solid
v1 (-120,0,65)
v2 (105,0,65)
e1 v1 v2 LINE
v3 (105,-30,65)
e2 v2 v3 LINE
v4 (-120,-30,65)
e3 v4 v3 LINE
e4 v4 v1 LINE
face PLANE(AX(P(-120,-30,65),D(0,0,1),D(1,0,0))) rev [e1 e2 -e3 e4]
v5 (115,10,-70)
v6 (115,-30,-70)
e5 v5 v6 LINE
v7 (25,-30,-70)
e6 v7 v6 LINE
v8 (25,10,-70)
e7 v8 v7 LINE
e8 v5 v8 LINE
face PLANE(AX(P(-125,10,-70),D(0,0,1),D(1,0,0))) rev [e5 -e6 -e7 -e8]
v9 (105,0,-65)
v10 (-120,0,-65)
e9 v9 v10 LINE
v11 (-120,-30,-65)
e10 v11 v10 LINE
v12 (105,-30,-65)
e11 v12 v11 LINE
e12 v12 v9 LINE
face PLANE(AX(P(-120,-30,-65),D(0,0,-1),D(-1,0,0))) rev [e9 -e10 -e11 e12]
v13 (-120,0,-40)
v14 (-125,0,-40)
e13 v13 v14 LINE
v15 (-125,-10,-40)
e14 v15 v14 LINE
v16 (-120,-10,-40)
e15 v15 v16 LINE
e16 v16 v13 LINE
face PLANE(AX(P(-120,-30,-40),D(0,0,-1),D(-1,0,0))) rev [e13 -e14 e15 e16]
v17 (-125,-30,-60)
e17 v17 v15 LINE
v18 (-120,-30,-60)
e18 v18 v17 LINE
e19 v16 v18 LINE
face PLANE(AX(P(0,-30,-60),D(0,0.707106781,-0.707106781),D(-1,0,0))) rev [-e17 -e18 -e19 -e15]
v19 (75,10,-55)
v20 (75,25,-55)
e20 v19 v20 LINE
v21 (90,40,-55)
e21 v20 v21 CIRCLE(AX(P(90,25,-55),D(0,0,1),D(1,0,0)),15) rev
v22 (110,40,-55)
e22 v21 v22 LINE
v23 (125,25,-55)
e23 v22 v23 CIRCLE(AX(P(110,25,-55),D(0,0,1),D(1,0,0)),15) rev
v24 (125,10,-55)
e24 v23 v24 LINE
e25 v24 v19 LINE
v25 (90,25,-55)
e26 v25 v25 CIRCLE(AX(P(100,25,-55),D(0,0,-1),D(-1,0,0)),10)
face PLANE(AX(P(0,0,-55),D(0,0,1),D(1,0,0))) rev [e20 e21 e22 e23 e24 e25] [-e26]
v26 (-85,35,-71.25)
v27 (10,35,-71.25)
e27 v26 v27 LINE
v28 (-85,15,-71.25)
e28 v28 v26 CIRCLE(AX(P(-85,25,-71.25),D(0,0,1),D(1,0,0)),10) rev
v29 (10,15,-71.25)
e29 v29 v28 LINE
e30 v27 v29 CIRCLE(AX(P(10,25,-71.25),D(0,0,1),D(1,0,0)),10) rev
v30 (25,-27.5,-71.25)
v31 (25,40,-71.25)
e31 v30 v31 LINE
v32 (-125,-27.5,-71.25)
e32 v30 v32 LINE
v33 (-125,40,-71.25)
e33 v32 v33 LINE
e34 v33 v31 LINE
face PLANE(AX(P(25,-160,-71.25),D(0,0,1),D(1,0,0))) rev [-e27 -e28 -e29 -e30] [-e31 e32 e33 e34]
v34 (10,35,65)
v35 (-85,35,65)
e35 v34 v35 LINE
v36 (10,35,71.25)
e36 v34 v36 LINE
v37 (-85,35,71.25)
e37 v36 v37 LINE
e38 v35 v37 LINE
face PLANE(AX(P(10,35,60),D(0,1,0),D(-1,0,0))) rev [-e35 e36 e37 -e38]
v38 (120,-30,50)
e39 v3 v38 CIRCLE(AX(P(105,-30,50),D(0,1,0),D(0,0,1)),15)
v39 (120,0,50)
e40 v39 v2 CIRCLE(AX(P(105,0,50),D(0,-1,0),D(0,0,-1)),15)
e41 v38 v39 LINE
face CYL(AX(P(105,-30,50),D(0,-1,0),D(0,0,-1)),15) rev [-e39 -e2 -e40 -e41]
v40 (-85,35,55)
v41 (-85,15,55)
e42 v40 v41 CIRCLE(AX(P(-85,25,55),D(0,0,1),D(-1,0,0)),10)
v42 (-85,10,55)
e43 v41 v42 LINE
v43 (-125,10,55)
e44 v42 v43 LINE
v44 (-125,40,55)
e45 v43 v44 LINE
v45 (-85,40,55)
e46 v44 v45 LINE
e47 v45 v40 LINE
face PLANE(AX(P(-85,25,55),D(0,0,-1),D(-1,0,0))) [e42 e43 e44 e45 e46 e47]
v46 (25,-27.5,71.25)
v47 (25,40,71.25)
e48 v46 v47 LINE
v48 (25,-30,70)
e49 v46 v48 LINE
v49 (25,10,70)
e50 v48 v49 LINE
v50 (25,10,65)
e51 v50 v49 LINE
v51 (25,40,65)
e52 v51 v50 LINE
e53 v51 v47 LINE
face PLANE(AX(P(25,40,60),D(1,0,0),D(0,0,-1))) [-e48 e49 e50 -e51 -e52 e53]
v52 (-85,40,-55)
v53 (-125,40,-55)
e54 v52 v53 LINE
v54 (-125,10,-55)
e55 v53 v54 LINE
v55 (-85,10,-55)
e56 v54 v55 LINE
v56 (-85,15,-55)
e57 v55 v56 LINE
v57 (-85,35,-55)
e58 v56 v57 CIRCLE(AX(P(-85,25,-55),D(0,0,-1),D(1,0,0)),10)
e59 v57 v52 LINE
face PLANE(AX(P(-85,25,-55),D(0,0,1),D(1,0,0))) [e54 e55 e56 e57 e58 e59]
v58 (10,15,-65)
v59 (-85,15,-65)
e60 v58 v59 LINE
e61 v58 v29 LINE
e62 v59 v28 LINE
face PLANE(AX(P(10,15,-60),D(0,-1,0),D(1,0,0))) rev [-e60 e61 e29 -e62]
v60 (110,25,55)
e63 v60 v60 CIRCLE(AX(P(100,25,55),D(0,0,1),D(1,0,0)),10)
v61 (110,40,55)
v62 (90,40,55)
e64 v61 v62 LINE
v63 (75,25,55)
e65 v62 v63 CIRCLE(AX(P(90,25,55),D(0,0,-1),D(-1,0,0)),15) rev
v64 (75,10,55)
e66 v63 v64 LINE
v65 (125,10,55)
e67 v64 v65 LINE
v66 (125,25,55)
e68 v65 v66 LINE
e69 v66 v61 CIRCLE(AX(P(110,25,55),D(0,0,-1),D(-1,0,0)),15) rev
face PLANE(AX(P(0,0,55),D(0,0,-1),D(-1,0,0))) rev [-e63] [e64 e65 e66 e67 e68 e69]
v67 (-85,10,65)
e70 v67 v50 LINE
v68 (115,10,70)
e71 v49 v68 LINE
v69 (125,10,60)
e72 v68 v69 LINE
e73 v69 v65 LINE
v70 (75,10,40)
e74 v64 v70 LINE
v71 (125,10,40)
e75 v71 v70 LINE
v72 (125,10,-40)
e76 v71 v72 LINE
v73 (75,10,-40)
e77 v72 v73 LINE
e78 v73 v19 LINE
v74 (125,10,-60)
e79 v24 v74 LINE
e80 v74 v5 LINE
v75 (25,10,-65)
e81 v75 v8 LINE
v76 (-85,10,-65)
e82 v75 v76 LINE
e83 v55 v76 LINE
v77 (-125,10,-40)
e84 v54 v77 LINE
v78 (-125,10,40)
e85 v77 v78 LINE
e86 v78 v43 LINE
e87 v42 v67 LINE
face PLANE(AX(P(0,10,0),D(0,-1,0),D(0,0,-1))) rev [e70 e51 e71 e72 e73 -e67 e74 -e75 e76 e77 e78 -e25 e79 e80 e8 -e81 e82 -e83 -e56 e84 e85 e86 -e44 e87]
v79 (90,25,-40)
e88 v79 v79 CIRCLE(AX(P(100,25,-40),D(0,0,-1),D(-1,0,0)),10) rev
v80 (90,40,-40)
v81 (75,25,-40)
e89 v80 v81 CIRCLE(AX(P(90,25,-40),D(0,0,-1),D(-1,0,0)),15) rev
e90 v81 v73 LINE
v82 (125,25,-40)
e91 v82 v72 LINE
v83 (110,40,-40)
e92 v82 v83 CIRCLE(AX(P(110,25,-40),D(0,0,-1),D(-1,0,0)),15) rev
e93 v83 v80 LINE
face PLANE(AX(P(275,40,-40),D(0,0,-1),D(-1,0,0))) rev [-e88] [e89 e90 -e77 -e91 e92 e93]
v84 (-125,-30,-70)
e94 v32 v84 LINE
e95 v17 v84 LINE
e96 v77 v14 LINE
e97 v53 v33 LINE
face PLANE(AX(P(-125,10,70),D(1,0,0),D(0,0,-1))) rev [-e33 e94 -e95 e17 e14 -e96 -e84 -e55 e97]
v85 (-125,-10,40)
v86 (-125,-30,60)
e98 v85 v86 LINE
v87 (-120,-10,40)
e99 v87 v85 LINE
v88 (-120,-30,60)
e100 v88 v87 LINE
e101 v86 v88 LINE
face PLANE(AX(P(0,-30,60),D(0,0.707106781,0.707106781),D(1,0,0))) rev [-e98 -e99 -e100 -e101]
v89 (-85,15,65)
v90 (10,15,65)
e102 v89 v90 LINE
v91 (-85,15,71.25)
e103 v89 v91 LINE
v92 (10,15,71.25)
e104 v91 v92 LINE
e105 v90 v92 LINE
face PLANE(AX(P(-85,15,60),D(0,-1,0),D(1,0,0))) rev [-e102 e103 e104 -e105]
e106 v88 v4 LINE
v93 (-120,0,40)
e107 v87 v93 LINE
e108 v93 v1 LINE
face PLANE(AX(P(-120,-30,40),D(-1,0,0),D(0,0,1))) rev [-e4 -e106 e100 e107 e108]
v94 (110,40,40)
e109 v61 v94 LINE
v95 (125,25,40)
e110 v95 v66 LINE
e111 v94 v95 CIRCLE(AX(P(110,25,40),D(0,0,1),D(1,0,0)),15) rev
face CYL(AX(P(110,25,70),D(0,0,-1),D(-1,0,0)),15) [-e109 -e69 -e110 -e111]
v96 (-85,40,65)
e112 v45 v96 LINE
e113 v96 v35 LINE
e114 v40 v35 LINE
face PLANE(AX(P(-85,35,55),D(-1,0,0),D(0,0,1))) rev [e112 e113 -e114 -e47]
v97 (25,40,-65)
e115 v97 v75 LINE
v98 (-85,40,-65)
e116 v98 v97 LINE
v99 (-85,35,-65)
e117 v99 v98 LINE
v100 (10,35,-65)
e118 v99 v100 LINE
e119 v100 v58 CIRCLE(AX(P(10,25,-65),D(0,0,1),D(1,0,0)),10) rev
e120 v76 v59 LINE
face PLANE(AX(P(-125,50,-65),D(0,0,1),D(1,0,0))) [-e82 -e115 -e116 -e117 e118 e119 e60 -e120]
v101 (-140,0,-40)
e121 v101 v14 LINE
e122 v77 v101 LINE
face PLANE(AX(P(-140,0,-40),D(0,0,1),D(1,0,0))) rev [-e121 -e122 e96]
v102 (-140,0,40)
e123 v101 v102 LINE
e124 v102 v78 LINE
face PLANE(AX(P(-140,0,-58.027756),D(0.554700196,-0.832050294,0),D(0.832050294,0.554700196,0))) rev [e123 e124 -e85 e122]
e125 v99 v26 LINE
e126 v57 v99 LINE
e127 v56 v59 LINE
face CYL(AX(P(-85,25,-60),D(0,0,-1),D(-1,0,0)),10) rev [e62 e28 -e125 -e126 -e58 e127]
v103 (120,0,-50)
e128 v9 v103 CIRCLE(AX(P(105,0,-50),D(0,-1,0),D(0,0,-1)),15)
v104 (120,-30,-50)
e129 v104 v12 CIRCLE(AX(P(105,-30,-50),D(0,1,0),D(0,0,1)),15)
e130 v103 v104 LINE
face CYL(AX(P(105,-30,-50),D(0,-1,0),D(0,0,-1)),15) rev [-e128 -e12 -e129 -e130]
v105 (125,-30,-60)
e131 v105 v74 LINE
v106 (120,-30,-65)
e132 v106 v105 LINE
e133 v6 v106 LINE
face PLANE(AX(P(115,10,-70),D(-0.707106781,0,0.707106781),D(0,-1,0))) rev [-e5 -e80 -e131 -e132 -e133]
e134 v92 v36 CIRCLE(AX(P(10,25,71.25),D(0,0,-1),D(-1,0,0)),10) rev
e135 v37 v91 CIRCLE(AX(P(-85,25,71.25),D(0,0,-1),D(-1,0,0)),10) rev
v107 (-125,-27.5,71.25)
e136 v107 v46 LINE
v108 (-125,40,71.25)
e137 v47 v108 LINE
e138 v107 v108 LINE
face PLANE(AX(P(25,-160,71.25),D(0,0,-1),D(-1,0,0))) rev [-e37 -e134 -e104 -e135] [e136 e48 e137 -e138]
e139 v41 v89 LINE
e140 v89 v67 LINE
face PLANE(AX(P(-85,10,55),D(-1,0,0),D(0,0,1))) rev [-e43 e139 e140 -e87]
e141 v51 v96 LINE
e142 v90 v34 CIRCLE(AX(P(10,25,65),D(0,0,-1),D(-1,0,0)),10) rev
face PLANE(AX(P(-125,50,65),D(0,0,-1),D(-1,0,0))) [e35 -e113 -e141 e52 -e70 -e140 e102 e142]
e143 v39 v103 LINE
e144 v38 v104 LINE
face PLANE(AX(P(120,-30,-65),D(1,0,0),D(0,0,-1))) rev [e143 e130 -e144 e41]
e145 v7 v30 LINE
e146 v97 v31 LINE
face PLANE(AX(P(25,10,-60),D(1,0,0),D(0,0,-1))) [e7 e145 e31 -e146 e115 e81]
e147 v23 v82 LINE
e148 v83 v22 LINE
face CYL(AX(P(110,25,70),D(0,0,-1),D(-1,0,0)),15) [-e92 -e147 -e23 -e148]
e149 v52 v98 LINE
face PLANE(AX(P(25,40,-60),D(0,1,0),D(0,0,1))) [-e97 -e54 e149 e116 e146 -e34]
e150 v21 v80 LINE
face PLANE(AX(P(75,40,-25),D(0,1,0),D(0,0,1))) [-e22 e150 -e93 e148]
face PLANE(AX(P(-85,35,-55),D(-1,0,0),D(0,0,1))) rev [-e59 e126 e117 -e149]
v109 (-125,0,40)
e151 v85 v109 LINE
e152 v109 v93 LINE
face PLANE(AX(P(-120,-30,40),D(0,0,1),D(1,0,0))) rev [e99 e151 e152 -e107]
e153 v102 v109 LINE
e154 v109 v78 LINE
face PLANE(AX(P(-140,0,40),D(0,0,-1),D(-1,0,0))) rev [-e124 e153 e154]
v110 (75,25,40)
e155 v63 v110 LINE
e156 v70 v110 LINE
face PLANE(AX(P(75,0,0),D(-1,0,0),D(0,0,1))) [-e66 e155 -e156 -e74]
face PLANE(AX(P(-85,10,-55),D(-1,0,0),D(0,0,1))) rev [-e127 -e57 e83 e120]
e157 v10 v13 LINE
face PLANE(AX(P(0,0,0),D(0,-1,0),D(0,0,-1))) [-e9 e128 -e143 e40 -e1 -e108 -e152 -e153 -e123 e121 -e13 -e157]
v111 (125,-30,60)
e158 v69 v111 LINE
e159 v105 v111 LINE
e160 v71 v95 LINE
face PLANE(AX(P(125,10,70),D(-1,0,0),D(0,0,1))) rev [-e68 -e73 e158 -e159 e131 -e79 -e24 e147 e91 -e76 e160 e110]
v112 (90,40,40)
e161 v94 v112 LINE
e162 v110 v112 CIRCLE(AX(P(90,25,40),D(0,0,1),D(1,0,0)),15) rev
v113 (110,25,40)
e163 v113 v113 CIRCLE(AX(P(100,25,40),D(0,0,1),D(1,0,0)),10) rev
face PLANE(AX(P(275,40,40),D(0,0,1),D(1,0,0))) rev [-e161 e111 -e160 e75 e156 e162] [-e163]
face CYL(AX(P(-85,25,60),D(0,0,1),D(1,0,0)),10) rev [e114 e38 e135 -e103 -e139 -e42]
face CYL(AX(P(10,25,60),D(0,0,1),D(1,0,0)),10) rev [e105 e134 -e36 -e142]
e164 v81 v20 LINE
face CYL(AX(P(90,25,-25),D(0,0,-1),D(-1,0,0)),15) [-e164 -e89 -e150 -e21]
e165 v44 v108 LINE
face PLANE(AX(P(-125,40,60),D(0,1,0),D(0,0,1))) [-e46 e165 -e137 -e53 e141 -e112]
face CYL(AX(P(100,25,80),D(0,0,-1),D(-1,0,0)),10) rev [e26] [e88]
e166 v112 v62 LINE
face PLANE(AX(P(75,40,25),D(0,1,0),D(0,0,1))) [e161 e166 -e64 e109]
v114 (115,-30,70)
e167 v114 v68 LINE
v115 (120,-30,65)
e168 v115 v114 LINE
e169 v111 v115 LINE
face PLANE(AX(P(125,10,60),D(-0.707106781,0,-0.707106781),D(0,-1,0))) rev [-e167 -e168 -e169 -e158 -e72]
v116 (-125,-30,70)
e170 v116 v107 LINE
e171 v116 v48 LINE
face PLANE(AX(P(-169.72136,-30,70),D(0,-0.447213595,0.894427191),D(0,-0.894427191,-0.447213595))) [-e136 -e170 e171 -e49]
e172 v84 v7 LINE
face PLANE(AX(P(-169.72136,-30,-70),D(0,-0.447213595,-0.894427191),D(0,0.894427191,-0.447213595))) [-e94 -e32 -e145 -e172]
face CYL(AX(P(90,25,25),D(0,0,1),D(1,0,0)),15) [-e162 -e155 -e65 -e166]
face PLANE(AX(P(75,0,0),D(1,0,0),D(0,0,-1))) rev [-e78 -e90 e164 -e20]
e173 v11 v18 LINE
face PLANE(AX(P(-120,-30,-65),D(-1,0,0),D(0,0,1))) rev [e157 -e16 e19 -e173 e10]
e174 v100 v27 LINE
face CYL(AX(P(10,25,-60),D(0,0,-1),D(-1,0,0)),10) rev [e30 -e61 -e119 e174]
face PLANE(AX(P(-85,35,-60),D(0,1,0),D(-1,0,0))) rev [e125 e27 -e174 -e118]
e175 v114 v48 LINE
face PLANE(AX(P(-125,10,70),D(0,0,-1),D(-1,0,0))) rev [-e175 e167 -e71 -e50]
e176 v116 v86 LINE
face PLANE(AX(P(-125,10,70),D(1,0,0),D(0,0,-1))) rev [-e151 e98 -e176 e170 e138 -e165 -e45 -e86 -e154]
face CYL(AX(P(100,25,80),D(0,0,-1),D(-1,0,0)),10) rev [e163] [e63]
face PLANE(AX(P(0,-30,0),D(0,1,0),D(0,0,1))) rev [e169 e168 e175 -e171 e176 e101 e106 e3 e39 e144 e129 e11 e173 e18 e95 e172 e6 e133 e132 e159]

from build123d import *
from build123d.topology import SkipClean

# Parameters (mm, degrees)
SKETCH1_W            = 250
SKETCH1_H            = 140
BOSS_EXTRUDE1_DEPTH  = 10
SKETCH2_W            = 150
SKETCH2_H            = 20
SKETCH2_W_2          = 50
BOSS_EXTRUDE2_DEPTH  = 30
CUT_EXTRUDE1_DEPTH   = 120
SKETCH4_R            = 10
CUT_EXTRUDE2_DEPTH   = 150
SKETCH6_W            = 10
SKETCH6_H            = 40
CUT_EXTRUDE4_DEPTH   = 150
SKETCH7_R            = 10
CUT_EXTRUDE5_DEPTH   = 150
FILLET2_R            = 10
FILLET3_R            = 10
SKETCH13_W           = 50
SKETCH13_H           = 25
SKETCH13_H_2         = 22.244291656
CUT_EXTRUDE6_DEPTH   = 40
SKETCH14_W           = 150
SKETCH14_H           = 30
BOSS_EXTRUDE3_DEPTH  = 10
BOSS_EXTRUDE4_START  = -10
SKETCH16_W           = 150
SKETCH16_H           = 30
BOSS_EXTRUDE4_DEPTH  = 10
SKETCH17_W           = 10
SKETCH17_H           = 30
BOSS_EXTRUDE5_DEPTH  = 50
CUT_EXTRUDE7_START   = -150
SKETCH18_R           = 10
CUT_EXTRUDE7_DEPTH   = 150
SKETCH19_W           = 163.570579747
SKETCH19_H           = 99.685934981
SKETCH19_W_2         = 64.103217044
SKETCH19_H_2         = 29.878618113
SKETCH19_W_3         = 86.104744928
SKETCH19_H_3         = 39.38545115
SKETCH19_W_4         = 22.687824792
SKETCH19_H_4         = 45.375649583
CUT_EXTRUDE8_DEPTH   = 150
BOSS_EXTRUDE6_DEPTH  = 30
BOSS_EXTRUDE8_START  = 20
SKETCH21_W           = 50
SKETCH21_H           = 30
SKETCH21_R           = 10
BOSS_EXTRUDE8_DEPTH  = 20
SKETCH22_W           = 50
SKETCH22_H           = 30
SKETCH22_R           = 10
BOSS_EXTRUDE9_DEPTH  = 20
BOSS_EXTRUDE10_START = 20
SKETCH23_W           = 150
SKETCH23_H           = 30
BOSS_EXTRUDE10_DEPTH = 20
SKETCH24_W           = 150
SKETCH24_H           = 30
BOSS_EXTRUDE11_DEPTH = 20
BOSS_EXTRUDE12_DEPTH = 150
SKETCH27_W           = 150
SKETCH27_H           = 5
CUT_EXTRUDE10_DEPTH  = 40
CUT_EXTRUDE11_REACH  = 270.701
SKETCH28_W           = 27.40328495
SKETCH28_H           = 74.426737968
SKETCH28_W_2         = 23.413674561
SKETCH28_H_2         = 78.651031322
SKETCH29_W           = 80
SKETCH29_H           = 10
BOSS_EXTRUDE13_DEPTH = 15
CUT_EXTRUDE12_DEPTH  = 80
SKETCH40_W           = 150
SKETCH40_H           = 6.25
CUT_EXTRUDE16_DEPTH  = 200
CHAMFER1_SIZE        = 10
FILLET6_R            = 15
CHAMFER2_SIZE        = 20
FILLET7_R            = 15
SKETCH41_W           = 80
SKETCH41_H           = 30
CUT_EXTRUDE18_DEPTH  = 200
BOSS_EXTRUDE16_START = 10
BOSS_EXTRUDE16_DEPTH = 10
BOSS_EXTRUDE17_DEPTH = 10


with BuildPart() as part:
    # Sketch1 → Boss-Extrude1 (new body)
    with BuildSketch(Plane(origin=(0, 0, 0), x_dir=(1, 0, 0), z_dir=(0, 1, 0))):
        Rectangle(SKETCH1_W, SKETCH1_H)
    extrude(amount=BOSS_EXTRUDE1_DEPTH)

    # Sketch2 → Boss-Extrude2 (add)
    with BuildSketch(Plane(origin=(0, 10, 0), x_dir=(1, 0, 0), z_dir=(0, 1, 0))):
        with Locations((-50, 35)):
            Rectangle(SKETCH2_W, SKETCH2_H)
        with Locations((-50, -35)):
            Rectangle(SKETCH2_W, SKETCH2_H)
        Polygon((125, -20), (125, 0), (125, 20), (105, 20), (105, -20), align=None)
        with Locations((100, 60)):
            Rectangle(SKETCH2_W_2, SKETCH2_H)
        with Locations((100, -60)):
            Rectangle(SKETCH2_W_2, SKETCH2_H)
    extrude(amount=BOSS_EXTRUDE2_DEPTH)

    # Sketch3 → Cut-Extrude1 (cut)
    with BuildSketch(Plane.XY.offset(45)):
        with BuildLine():
            Line((10, 35), (-110, 35))
            ThreePointArc((-110, 35), (-120, 25), (-110, 15))
            Line((-110, 15), (10, 15))
            ThreePointArc((10, 15), (20, 25), (10, 35))
        make_face()
    extrude(amount=-CUT_EXTRUDE1_DEPTH, mode=Mode.SUBTRACT)

    # Sketch4 → Cut-Extrude2 (cut)
    with BuildSketch(Plane.XY.offset(70)):
        with Locations((100, 25)):
            Circle(SKETCH4_R)
    extrude(amount=-CUT_EXTRUDE2_DEPTH, mode=Mode.SUBTRACT)

    # Sketch6 → Cut-Extrude4 (cut)
    with BuildSketch(Plane(origin=(0, 10, 0), x_dir=(1, 0, 0), z_dir=(0, 1, 0))):
        with Locations((110, 0)):
            Rectangle(SKETCH6_W, SKETCH6_H)
    extrude(amount=CUT_EXTRUDE4_DEPTH, mode=Mode.SUBTRACT)

    # Sketch7 → Cut-Extrude5 (cut)
    with BuildSketch(Plane(origin=(125, 0, 0), x_dir=(0, 0, -1), z_dir=(1, 0, 0))):
        with Locations((0, 25)):
            Circle(SKETCH7_R)
    extrude(amount=-CUT_EXTRUDE5_DEPTH, mode=Mode.SUBTRACT)

    # Fillet2
    fillet2_edges = [part.edges().sort_by_distance(p)[0] for p in [
        (120, 40, 20),
        (120, 40, -20),
    ]]
    fillet(fillet2_edges, radius=FILLET2_R)

    # Fillet3
    fillet3_edges = [part.edges().sort_by_distance(p)[0] for p in [
        (75, 40, -60),
        (125, 40, -60),
        (75, 40, 60),
        (125, 40, 60),
    ]]
    fillet(fillet3_edges, radius=FILLET3_R)

    # Sketch13 → Cut-Extrude6 (cut)
    with BuildSketch(Plane(origin=(0, 10, 0), x_dir=(1, 0, 0), z_dir=(0, 1, 0))):
        with Locations((100, 47.5)):
            Rectangle(SKETCH13_W, SKETCH13_H)
        with Locations((100, -48.877854172)):
            Rectangle(SKETCH13_W, SKETCH13_H_2)
    extrude(amount=CUT_EXTRUDE6_DEPTH, mode=Mode.SUBTRACT)

    # Sketch14 → Boss-Extrude3 (add)
    with BuildSketch(Plane.XY.offset(70)):
        with Locations((-50, 25)):
            Rectangle(SKETCH14_W, SKETCH14_H)
        with BuildLine():
            Line((10, 35), (-85, 35))
            ThreePointArc((-85, 35), (-95, 25), (-85, 15))
            Line((-85, 15), (10, 15))
            ThreePointArc((10, 15), (20, 25), (10, 35))
        make_face(mode=Mode.SUBTRACT)
    extrude(amount=-BOSS_EXTRUDE3_DEPTH)

    # Sketch16 → Boss-Extrude4 (add)
    with BuildSketch(Plane(origin=(0, 0, -70), x_dir=(-1, 0, 0), z_dir=(0, 0, -1)).offset(BOSS_EXTRUDE4_START)):
        with Locations((50, 25)):
            Rectangle(SKETCH16_W, SKETCH16_H)
        with BuildLine():
            Line((85, 35), (-10, 35))
            ThreePointArc((-10, 35), (-20, 25), (-10, 15))
            Line((-10, 15), (85, 15))
            ThreePointArc((85, 15), (95, 25), (85, 35))
        make_face(mode=Mode.SUBTRACT)
    extrude(amount=BOSS_EXTRUDE4_DEPTH)

    # Sketch17 → Boss-Extrude5 (add)
    with BuildSketch(Plane(origin=(125, 0, 0), x_dir=(0, 0, -1), z_dir=(1, 0, 0))):
        with Locations((30, 25)):
            Rectangle(SKETCH17_W, SKETCH17_H)
        with Locations((-30, 25)):
            Rectangle(SKETCH17_W, SKETCH17_H)
    extrude(amount=-BOSS_EXTRUDE5_DEPTH)

    # Sketch18 → Cut-Extrude7 (cut)
    with BuildSketch(Plane(origin=(0, 0, -70), x_dir=(-1, 0, 0), z_dir=(0, 0, -1)).offset(CUT_EXTRUDE7_START)):
        with Locations(Location((-100, 25, 0), (0, 0, 180))):
            Circle(SKETCH18_R)
    extrude(amount=CUT_EXTRUDE7_DEPTH, mode=Mode.SUBTRACT)

    # Sketch19 → Cut-Extrude8 (cut)
    with BuildSketch(Plane(origin=(0, 10, 0), x_dir=(1, 0, 0), z_dir=(0, 1, 0))):
        with Locations((-43.214710127, 0.1358119)):
            Rectangle(SKETCH19_W, SKETCH19_H)
        with Locations((99.142687378, 64.918088447)):
            Rectangle(SKETCH19_W_2, SKETCH19_H_2)
        with Locations((110.14345132, -67.226890756)):
            Rectangle(SKETCH19_W_3, SKETCH19_H_3)
        with Locations((124.2319325, 0.52597354)):
            Rectangle(SKETCH19_W_4, SKETCH19_H_4)
    extrude(amount=CUT_EXTRUDE8_DEPTH, mode=Mode.SUBTRACT)

    # Sketch20 → Boss-Extrude6 (add)
    with BuildSketch(Plane.XZ):
        Polygon((-125, 40), (-125, 70), (125, 70), (125, -70), (-125, -70), (-125, -40), (-120, -40), (-120, -65), (120, -65), (120, 65), (-120, 65), (-120, 40), align=None)
    extrude(amount=BOSS_EXTRUDE6_DEPTH)

    # Sketch21 → Boss-Extrude8 (add)
    with SkipClean():  # the faces are left unmerged after this step: merging them gives an invalid solid
        with BuildSketch(Plane.XY.offset(35).offset(BOSS_EXTRUDE8_START)):
            with Locations((100, 25)):
                Rectangle(SKETCH21_W, SKETCH21_H)
            with Locations(Location((100, 25, 0), (0, 0, 180))):
                Circle(SKETCH21_R, mode=Mode.SUBTRACT)
        extrude(amount=-BOSS_EXTRUDE8_DEPTH)

    # Sketch22 → Boss-Extrude9 (add)
    with SkipClean():  # the faces are left unmerged after this step: merging them gives an invalid solid
        with BuildSketch(Plane(origin=(0, 0, -35), x_dir=(-1, 0, 0), z_dir=(0, 0, -1))):
            with Locations((-100, 25)):
                Rectangle(SKETCH22_W, SKETCH22_H)
            with Locations((-100, 25)):
                Circle(SKETCH22_R, mode=Mode.SUBTRACT)
        extrude(amount=BOSS_EXTRUDE9_DEPTH)

    # Sketch23 → Boss-Extrude10 (add)
    with SkipClean():  # the faces are left unmerged after this step: merging them gives an invalid solid
        with BuildSketch(Plane.XY.offset(70).offset(BOSS_EXTRUDE10_START)):
            with Locations((-50, 25)):
                Rectangle(SKETCH23_W, SKETCH23_H)
            with BuildLine():
                Line((10, 35), (-85, 35))
                ThreePointArc((-85, 35), (-95, 25), (-85, 15))
                Line((-85, 15), (10, 15))
                ThreePointArc((10, 15), (20, 25), (10, 35))
            make_face(mode=Mode.SUBTRACT)
        extrude(amount=-BOSS_EXTRUDE10_DEPTH)

    # Sketch24 → Boss-Extrude11 (add)
    with SkipClean():  # the faces are left unmerged after this step: merging them gives an invalid solid
        with BuildSketch(Plane(origin=(0, 0, -70), x_dir=(-1, 0, 0), z_dir=(0, 0, -1))):
            with Locations((50, 25)):
                Rectangle(SKETCH24_W, SKETCH24_H)
            with BuildLine():
                Line((-10, 35), (85, 35))
                ThreePointArc((85, 35), (95, 25), (85, 15))
                Line((85, 15), (-10, 15))
                ThreePointArc((-10, 15), (-20, 25), (-10, 35))
            make_face(mode=Mode.SUBTRACT)
        extrude(amount=BOSS_EXTRUDE11_DEPTH)

    # Sketch26 → Boss-Extrude12 (add)
    with SkipClean():  # the faces are left unmerged after this step: merging them gives an invalid solid
        with BuildSketch(Plane(origin=(25, 0, 0), x_dir=(0, 0, -1), z_dir=(1, 0, 0))):
            Polygon((70, -30), (90, 10), (70, 10), align=None)
            Polygon((-90, 10), (-70, 10), (-70, -30), align=None)
        extrude(amount=-BOSS_EXTRUDE12_DEPTH)

    # Sketch27 → Cut-Extrude10 (cut)
    with SkipClean():  # the faces are left unmerged after this step: merging them gives an invalid solid
        with BuildSketch(Plane(origin=(0, 10, 0), x_dir=(1, 0, 0), z_dir=(0, 1, 0))):
            with Locations((-50, 62.5)):
                Rectangle(SKETCH27_W, SKETCH27_H)
            with Locations((-50, -62.5)):
                Rectangle(SKETCH27_W, SKETCH27_H)
        extrude(amount=CUT_EXTRUDE10_DEPTH, mode=Mode.SUBTRACT)

    # Cut-Extrude11: up to this face of the body (flat: up to its plane)
    cut_extrude11_end = Plane(part.part.faces().sort_by_distance((25, 25, -80))[0])
    # Sketch28 → Cut-Extrude11 (cut, up to the picked face)
    with BuildSketch(Plane.ZY.offset(125), mode=Mode.PRIVATE) as cut_extrude11_sk1:
        with Locations((-91.201642475, 2.786631016)):
            Rectangle(SKETCH28_W, SKETCH28_H)
    cut_extrude11_tool1 = split(extrude(cut_extrude11_sk1.sketch, amount=-CUT_EXTRUDE11_REACH, mode=Mode.PRIVATE), bisect_by=cut_extrude11_end, keep=Keep.BOTH, mode=Mode.PRIVATE)
    # Sketch28 → Cut-Extrude11 (cut, up to the picked face)
    with BuildSketch(Plane.ZY.offset(125), mode=Mode.PRIVATE) as cut_extrude11_sk2:
        with Locations((89.20683728, 0.674484339)):
            Rectangle(SKETCH28_W_2, SKETCH28_H_2)
    cut_extrude11_tool2 = split(extrude(cut_extrude11_sk2.sketch, amount=-CUT_EXTRUDE11_REACH, mode=Mode.PRIVATE), bisect_by=cut_extrude11_end, keep=Keep.BOTH, mode=Mode.PRIVATE)
    add(cut_extrude11_tool1.solids().sort_by(Axis((-125, 2.786631, -91.201642), (1, 0, 0)))[0], mode=Mode.SUBTRACT)
    add(cut_extrude11_tool2.solids().sort_by(Axis((-125, 0.674484, 89.206837), (1, 0, 0)))[0], mode=Mode.SUBTRACT)

    # Sketch29 → Boss-Extrude13 (add)
    with SkipClean():  # the faces are left unmerged after this step: merging them gives an invalid solid
        with BuildSketch(Plane.ZY.offset(125)):
            with Locations((0, 5)):
                Rectangle(SKETCH29_W, SKETCH29_H)
        extrude(amount=BOSS_EXTRUDE13_DEPTH)

    # Sketch31 → Cut-Extrude12 (cut)
    with SkipClean():  # the faces are left unmerged after this step: merging them gives an invalid solid
        with BuildSketch(Plane.XY.offset(40)):
            Polygon((-140, 0), (-125, 10), (-140, 10), align=None)
        extrude(amount=-CUT_EXTRUDE12_DEPTH, mode=Mode.SUBTRACT)

    # Sketch40 → Cut-Extrude16 (cut)
    with SkipClean():  # the faces are left unmerged after this step: merging them gives an invalid solid
        with BuildSketch(Plane(origin=(0, 40, 0), x_dir=(1, 0, 0), z_dir=(0, 1, 0))):
            with Locations((-50, 74.375)):
                Rectangle(SKETCH40_W, SKETCH40_H)
            with Locations((-50, -74.375)):
                Rectangle(SKETCH40_W, SKETCH40_H)
        extrude(amount=-CUT_EXTRUDE16_DEPTH, mode=Mode.SUBTRACT)

    # Chamfer1
    chamfer1_edges = [part.edges().sort_by_distance(p)[0] for p in [
        (125, -10, 70),
        (125, -10, -70),
    ]]
    chamfer(chamfer1_edges, length=CHAMFER1_SIZE - 0.0001)  # a hair under: the kernel refuses the full size

    # Fillet6
    fillet6_edges = [part.edges().sort_by_distance(p)[0] for p in [
        (75, 40, -40),
        (125, 40, -40),
        (75, 40, 40),
        (125, 40, 40),
    ]]
    fillet(fillet6_edges, radius=FILLET6_R)

    # Chamfer2
    chamfer2_edges = [part.edges().sort_by_distance(p)[0] for p in [
        (-122.5, -30, 40),
        (-122.5, -30, -40),
    ]]
    chamfer(chamfer2_edges, length=CHAMFER2_SIZE)

    # Fillet7
    fillet7_edges = [part.edges().sort_by_distance(p)[0] for p in [
        (120, -15, 65),
        (120, -15, -65),
    ]]
    fillet(fillet7_edges, radius=FILLET7_R)

    # Sketch41 → Cut-Extrude18 (cut)
    with BuildSketch(Plane.ZY.offset(-75)):
        with Locations((0, 25)):
            Rectangle(SKETCH41_W, SKETCH41_H)
    extrude(amount=-CUT_EXTRUDE18_DEPTH, mode=Mode.SUBTRACT)

    # Sketch42 → Boss-Extrude16 (add)
    with BuildSketch(Plane.XY.offset(-65).offset(BOSS_EXTRUDE16_START)):
        with BuildLine():
            Line((-85, 35), (-85, 40))
            Line((-85, 40), (-125, 40))
            Line((-125, 40), (-125, 10))
            Line((-125, 10), (-85, 10))
            Line((-85, 10), (-85, 15))
            ThreePointArc((-85, 15), (-95, 25), (-85, 35))
        make_face()
    extrude(amount=-BOSS_EXTRUDE16_DEPTH)

    # Sketch43 → Boss-Extrude17 (add)
    with BuildSketch(Plane(origin=(0, 0, 65), x_dir=(-1, 0, 0), z_dir=(0, 0, -1))):
        with BuildLine():
            Line((85, 35), (85, 40))
            Line((85, 40), (125, 40))
            Line((125, 40), (125, 10))
            Line((125, 10), (85, 10))
            Line((85, 10), (85, 15))
            ThreePointArc((85, 15), (95, 25), (85, 35))
        make_face()
    extrude(amount=BOSS_EXTRUDE17_DEPTH)


solid = part.part
